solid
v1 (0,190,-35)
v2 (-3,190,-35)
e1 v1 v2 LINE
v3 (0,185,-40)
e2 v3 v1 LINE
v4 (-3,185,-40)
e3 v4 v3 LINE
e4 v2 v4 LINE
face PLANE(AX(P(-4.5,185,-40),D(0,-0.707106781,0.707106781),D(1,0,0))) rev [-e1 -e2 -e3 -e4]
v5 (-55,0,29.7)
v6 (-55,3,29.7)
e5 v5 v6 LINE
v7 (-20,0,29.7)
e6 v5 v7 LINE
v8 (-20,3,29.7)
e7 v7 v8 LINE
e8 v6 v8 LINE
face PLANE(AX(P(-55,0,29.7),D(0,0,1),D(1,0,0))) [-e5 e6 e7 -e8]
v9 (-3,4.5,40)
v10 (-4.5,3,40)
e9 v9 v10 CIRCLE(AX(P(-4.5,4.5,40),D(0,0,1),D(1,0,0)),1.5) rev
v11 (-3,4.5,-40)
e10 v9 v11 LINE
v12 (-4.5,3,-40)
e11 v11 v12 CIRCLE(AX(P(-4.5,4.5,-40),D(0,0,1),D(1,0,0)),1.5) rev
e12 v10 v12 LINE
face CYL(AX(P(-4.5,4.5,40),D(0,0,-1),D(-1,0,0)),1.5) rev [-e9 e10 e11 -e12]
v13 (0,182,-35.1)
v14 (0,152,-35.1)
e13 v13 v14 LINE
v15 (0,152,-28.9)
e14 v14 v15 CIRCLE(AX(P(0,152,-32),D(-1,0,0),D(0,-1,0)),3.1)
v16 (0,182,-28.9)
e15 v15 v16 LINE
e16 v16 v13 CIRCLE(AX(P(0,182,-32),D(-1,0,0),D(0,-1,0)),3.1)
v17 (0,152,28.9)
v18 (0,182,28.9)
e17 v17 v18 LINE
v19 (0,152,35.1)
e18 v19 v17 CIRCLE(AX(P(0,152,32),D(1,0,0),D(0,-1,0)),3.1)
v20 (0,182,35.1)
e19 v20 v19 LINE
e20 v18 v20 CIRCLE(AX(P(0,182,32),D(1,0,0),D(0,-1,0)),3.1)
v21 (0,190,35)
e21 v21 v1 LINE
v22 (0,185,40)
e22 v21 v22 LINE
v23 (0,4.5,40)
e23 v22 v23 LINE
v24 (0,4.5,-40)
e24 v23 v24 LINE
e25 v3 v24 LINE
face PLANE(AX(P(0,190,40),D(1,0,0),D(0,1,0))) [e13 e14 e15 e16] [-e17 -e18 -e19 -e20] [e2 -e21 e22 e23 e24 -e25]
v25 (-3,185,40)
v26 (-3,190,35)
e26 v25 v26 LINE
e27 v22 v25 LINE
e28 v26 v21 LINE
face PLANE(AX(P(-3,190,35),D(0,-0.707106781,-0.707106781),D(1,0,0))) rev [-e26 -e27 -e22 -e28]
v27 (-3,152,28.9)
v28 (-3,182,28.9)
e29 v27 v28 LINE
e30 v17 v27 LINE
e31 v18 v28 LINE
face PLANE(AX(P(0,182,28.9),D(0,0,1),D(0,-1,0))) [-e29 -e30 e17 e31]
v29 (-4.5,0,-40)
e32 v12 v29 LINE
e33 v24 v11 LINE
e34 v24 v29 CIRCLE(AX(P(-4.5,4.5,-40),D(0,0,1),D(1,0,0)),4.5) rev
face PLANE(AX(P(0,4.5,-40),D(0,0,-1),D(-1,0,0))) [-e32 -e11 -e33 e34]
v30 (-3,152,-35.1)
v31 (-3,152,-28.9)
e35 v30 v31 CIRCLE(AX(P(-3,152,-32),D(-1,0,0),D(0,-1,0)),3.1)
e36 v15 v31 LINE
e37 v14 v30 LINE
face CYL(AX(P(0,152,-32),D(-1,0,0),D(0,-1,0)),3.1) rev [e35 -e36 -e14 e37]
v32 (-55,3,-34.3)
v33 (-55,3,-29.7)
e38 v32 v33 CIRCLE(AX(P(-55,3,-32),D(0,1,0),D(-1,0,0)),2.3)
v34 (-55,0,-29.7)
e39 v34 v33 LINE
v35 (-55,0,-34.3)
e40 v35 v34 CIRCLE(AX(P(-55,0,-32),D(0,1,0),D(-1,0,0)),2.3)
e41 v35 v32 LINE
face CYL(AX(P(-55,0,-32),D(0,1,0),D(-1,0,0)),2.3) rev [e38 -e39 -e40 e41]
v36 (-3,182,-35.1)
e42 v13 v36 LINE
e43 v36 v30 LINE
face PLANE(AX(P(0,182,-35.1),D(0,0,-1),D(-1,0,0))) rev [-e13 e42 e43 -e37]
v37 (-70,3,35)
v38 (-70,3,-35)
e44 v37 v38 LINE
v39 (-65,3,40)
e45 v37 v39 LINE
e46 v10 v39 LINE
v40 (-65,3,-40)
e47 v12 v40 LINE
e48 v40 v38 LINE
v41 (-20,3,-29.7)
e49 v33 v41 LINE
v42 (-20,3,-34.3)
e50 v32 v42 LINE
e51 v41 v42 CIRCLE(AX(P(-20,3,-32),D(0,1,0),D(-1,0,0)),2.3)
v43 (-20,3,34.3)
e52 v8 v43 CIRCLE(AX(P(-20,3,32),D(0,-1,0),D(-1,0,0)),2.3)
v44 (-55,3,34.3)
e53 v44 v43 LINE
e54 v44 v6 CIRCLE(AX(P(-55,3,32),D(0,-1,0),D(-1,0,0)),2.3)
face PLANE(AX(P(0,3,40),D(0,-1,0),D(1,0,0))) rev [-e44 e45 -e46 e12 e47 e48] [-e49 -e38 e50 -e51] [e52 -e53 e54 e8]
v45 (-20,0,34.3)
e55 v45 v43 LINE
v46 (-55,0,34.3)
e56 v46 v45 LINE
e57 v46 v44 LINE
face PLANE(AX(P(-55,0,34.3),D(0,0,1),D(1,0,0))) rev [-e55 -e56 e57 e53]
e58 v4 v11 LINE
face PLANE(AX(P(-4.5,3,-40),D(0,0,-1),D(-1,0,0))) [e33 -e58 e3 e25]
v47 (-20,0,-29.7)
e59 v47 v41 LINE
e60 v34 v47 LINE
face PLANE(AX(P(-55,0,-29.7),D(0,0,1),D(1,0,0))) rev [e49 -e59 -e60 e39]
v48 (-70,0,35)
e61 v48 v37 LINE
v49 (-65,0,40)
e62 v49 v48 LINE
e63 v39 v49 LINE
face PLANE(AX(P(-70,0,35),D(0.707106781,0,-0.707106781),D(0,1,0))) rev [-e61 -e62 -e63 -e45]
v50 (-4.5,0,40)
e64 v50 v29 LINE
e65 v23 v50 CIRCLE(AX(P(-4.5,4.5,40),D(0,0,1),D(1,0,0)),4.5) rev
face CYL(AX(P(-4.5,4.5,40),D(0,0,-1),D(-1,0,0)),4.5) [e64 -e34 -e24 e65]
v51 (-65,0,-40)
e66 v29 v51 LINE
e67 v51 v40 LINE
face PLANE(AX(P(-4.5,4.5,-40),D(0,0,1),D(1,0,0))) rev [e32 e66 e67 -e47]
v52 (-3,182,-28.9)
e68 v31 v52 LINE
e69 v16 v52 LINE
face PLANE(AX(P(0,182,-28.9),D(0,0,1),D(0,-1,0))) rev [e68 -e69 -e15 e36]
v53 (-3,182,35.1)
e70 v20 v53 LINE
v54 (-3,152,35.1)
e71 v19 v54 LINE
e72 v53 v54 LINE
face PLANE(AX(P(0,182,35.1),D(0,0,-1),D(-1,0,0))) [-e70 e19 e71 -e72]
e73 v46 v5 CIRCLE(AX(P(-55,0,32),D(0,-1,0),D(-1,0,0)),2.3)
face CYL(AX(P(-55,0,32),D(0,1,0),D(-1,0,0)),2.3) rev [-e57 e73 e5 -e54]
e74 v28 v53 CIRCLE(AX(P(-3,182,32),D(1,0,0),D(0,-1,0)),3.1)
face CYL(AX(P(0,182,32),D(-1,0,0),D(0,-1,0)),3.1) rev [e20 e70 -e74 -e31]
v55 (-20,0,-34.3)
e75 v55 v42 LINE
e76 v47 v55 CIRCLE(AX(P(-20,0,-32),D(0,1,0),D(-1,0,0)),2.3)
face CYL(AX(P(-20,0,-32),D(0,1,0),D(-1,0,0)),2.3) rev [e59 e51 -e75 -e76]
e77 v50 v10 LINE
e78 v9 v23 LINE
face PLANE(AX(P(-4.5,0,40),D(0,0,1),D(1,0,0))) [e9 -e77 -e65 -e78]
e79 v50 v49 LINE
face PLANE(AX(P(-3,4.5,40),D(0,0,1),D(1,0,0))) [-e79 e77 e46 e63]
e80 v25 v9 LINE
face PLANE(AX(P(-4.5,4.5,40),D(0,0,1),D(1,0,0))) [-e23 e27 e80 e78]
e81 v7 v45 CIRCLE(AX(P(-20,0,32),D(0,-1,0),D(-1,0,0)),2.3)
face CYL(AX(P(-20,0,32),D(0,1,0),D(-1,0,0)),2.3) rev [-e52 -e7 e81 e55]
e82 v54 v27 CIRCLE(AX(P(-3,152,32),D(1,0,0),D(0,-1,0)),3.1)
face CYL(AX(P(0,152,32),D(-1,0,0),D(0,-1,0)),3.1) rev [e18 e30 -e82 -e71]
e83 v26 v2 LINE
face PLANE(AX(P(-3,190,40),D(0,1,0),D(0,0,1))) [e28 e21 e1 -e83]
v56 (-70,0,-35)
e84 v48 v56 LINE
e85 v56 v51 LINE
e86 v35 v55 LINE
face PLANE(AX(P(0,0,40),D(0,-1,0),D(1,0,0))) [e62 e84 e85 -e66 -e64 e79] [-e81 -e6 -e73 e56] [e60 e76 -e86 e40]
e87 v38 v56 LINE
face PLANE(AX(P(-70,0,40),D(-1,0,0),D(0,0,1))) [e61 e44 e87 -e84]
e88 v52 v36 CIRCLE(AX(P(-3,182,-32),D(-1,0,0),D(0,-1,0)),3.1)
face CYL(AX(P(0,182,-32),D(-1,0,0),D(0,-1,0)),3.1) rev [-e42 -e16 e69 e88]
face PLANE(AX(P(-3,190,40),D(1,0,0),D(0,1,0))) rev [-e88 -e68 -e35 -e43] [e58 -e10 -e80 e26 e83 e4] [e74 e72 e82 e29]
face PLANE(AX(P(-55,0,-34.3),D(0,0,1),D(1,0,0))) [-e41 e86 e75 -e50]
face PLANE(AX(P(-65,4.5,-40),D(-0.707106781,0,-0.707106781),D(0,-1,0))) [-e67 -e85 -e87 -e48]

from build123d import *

# Parameters (mm, degrees)
SM_BASE_FLANGE_1_DEPTH = 40
CHAMFER_1_SIZE         = 5
CUT_EXTRUDE_1_DEPTH    = 206.399610516
CUT_EXTRUDE_2_DEPTH    = 204.639387153


# Sheet-metal steps are written as plain solids
with BuildPart() as part:
    # Sketch 2 → 基体-法兰1 (new, symmetric)
    with BuildSketch(Plane.XY):
        with BuildLine():
            Line((0, 190), (0, 4.5))
            ThreePointArc((0, 4.5), (-1.318019485, 1.318019485), (-4.5, 0))
            Line((-4.5, 0), (-70, 0))
            Line((-70, 0), (-70, 3))
            Line((-70, 3), (-4.5, 3))
            ThreePointArc((-4.5, 3), (-3.439339828, 3.439339828), (-3, 4.5))
            Line((-3, 4.5), (-3, 190))
            Line((-3, 190), (0, 190))
        make_face()
    extrude(amount=SM_BASE_FLANGE_1_DEPTH, both=True)

    # 倒角1
    chamfer_1_edges = [part.edges().sort_by_distance(p)[0] for p in [
        (-1.5, 190, 40),
        (-70, 1.5, 40),
        (-1.5, 190, -40),
        (-70, 1.5, -40),
    ]]
    chamfer(chamfer_1_edges, length=CHAMFER_1_SIZE)

    # 草图7 → 切除-拉伸1 (cut, through all)
    with BuildSketch(Plane.ZY.offset(3)):
        with BuildLine():
            Line((-28.9, 182), (-28.9, 152))
            ThreePointArc((-28.9, 152), (-32, 148.9), (-35.1, 152))
            Line((-35.1, 152), (-35.1, 182))
            ThreePointArc((-35.1, 182), (-32, 185.1), (-28.9, 182))
        make_face()
    cut_extrude_1 = extrude(amount=-CUT_EXTRUDE_1_DEPTH, mode=Mode.SUBTRACT)

    # 草图10 → 切除-拉伸2 (cut, through all)
    with BuildSketch(Plane(origin=(0, 3, 0), x_dir=(1, 0, 0), z_dir=(0, 1, 0))):
        with BuildLine():
            Line((-55, 34.3), (-20, 34.3))
            ThreePointArc((-20, 34.3), (-17.7, 32), (-20, 29.7))
            Line((-20, 29.7), (-55, 29.7))
            ThreePointArc((-55, 29.7), (-57.3, 32), (-55, 34.3))
        make_face()
    cut_extrude_2 = extrude(amount=-CUT_EXTRUDE_2_DEPTH, mode=Mode.SUBTRACT)

    # 镜向1: 切除-拉伸1, 切除-拉伸2 across plane
    add(cut_extrude_1.mirror(Plane.XY), mode=Mode.SUBTRACT)
    add(cut_extrude_2.mirror(Plane.XY), mode=Mode.SUBTRACT)


solid = part.part
